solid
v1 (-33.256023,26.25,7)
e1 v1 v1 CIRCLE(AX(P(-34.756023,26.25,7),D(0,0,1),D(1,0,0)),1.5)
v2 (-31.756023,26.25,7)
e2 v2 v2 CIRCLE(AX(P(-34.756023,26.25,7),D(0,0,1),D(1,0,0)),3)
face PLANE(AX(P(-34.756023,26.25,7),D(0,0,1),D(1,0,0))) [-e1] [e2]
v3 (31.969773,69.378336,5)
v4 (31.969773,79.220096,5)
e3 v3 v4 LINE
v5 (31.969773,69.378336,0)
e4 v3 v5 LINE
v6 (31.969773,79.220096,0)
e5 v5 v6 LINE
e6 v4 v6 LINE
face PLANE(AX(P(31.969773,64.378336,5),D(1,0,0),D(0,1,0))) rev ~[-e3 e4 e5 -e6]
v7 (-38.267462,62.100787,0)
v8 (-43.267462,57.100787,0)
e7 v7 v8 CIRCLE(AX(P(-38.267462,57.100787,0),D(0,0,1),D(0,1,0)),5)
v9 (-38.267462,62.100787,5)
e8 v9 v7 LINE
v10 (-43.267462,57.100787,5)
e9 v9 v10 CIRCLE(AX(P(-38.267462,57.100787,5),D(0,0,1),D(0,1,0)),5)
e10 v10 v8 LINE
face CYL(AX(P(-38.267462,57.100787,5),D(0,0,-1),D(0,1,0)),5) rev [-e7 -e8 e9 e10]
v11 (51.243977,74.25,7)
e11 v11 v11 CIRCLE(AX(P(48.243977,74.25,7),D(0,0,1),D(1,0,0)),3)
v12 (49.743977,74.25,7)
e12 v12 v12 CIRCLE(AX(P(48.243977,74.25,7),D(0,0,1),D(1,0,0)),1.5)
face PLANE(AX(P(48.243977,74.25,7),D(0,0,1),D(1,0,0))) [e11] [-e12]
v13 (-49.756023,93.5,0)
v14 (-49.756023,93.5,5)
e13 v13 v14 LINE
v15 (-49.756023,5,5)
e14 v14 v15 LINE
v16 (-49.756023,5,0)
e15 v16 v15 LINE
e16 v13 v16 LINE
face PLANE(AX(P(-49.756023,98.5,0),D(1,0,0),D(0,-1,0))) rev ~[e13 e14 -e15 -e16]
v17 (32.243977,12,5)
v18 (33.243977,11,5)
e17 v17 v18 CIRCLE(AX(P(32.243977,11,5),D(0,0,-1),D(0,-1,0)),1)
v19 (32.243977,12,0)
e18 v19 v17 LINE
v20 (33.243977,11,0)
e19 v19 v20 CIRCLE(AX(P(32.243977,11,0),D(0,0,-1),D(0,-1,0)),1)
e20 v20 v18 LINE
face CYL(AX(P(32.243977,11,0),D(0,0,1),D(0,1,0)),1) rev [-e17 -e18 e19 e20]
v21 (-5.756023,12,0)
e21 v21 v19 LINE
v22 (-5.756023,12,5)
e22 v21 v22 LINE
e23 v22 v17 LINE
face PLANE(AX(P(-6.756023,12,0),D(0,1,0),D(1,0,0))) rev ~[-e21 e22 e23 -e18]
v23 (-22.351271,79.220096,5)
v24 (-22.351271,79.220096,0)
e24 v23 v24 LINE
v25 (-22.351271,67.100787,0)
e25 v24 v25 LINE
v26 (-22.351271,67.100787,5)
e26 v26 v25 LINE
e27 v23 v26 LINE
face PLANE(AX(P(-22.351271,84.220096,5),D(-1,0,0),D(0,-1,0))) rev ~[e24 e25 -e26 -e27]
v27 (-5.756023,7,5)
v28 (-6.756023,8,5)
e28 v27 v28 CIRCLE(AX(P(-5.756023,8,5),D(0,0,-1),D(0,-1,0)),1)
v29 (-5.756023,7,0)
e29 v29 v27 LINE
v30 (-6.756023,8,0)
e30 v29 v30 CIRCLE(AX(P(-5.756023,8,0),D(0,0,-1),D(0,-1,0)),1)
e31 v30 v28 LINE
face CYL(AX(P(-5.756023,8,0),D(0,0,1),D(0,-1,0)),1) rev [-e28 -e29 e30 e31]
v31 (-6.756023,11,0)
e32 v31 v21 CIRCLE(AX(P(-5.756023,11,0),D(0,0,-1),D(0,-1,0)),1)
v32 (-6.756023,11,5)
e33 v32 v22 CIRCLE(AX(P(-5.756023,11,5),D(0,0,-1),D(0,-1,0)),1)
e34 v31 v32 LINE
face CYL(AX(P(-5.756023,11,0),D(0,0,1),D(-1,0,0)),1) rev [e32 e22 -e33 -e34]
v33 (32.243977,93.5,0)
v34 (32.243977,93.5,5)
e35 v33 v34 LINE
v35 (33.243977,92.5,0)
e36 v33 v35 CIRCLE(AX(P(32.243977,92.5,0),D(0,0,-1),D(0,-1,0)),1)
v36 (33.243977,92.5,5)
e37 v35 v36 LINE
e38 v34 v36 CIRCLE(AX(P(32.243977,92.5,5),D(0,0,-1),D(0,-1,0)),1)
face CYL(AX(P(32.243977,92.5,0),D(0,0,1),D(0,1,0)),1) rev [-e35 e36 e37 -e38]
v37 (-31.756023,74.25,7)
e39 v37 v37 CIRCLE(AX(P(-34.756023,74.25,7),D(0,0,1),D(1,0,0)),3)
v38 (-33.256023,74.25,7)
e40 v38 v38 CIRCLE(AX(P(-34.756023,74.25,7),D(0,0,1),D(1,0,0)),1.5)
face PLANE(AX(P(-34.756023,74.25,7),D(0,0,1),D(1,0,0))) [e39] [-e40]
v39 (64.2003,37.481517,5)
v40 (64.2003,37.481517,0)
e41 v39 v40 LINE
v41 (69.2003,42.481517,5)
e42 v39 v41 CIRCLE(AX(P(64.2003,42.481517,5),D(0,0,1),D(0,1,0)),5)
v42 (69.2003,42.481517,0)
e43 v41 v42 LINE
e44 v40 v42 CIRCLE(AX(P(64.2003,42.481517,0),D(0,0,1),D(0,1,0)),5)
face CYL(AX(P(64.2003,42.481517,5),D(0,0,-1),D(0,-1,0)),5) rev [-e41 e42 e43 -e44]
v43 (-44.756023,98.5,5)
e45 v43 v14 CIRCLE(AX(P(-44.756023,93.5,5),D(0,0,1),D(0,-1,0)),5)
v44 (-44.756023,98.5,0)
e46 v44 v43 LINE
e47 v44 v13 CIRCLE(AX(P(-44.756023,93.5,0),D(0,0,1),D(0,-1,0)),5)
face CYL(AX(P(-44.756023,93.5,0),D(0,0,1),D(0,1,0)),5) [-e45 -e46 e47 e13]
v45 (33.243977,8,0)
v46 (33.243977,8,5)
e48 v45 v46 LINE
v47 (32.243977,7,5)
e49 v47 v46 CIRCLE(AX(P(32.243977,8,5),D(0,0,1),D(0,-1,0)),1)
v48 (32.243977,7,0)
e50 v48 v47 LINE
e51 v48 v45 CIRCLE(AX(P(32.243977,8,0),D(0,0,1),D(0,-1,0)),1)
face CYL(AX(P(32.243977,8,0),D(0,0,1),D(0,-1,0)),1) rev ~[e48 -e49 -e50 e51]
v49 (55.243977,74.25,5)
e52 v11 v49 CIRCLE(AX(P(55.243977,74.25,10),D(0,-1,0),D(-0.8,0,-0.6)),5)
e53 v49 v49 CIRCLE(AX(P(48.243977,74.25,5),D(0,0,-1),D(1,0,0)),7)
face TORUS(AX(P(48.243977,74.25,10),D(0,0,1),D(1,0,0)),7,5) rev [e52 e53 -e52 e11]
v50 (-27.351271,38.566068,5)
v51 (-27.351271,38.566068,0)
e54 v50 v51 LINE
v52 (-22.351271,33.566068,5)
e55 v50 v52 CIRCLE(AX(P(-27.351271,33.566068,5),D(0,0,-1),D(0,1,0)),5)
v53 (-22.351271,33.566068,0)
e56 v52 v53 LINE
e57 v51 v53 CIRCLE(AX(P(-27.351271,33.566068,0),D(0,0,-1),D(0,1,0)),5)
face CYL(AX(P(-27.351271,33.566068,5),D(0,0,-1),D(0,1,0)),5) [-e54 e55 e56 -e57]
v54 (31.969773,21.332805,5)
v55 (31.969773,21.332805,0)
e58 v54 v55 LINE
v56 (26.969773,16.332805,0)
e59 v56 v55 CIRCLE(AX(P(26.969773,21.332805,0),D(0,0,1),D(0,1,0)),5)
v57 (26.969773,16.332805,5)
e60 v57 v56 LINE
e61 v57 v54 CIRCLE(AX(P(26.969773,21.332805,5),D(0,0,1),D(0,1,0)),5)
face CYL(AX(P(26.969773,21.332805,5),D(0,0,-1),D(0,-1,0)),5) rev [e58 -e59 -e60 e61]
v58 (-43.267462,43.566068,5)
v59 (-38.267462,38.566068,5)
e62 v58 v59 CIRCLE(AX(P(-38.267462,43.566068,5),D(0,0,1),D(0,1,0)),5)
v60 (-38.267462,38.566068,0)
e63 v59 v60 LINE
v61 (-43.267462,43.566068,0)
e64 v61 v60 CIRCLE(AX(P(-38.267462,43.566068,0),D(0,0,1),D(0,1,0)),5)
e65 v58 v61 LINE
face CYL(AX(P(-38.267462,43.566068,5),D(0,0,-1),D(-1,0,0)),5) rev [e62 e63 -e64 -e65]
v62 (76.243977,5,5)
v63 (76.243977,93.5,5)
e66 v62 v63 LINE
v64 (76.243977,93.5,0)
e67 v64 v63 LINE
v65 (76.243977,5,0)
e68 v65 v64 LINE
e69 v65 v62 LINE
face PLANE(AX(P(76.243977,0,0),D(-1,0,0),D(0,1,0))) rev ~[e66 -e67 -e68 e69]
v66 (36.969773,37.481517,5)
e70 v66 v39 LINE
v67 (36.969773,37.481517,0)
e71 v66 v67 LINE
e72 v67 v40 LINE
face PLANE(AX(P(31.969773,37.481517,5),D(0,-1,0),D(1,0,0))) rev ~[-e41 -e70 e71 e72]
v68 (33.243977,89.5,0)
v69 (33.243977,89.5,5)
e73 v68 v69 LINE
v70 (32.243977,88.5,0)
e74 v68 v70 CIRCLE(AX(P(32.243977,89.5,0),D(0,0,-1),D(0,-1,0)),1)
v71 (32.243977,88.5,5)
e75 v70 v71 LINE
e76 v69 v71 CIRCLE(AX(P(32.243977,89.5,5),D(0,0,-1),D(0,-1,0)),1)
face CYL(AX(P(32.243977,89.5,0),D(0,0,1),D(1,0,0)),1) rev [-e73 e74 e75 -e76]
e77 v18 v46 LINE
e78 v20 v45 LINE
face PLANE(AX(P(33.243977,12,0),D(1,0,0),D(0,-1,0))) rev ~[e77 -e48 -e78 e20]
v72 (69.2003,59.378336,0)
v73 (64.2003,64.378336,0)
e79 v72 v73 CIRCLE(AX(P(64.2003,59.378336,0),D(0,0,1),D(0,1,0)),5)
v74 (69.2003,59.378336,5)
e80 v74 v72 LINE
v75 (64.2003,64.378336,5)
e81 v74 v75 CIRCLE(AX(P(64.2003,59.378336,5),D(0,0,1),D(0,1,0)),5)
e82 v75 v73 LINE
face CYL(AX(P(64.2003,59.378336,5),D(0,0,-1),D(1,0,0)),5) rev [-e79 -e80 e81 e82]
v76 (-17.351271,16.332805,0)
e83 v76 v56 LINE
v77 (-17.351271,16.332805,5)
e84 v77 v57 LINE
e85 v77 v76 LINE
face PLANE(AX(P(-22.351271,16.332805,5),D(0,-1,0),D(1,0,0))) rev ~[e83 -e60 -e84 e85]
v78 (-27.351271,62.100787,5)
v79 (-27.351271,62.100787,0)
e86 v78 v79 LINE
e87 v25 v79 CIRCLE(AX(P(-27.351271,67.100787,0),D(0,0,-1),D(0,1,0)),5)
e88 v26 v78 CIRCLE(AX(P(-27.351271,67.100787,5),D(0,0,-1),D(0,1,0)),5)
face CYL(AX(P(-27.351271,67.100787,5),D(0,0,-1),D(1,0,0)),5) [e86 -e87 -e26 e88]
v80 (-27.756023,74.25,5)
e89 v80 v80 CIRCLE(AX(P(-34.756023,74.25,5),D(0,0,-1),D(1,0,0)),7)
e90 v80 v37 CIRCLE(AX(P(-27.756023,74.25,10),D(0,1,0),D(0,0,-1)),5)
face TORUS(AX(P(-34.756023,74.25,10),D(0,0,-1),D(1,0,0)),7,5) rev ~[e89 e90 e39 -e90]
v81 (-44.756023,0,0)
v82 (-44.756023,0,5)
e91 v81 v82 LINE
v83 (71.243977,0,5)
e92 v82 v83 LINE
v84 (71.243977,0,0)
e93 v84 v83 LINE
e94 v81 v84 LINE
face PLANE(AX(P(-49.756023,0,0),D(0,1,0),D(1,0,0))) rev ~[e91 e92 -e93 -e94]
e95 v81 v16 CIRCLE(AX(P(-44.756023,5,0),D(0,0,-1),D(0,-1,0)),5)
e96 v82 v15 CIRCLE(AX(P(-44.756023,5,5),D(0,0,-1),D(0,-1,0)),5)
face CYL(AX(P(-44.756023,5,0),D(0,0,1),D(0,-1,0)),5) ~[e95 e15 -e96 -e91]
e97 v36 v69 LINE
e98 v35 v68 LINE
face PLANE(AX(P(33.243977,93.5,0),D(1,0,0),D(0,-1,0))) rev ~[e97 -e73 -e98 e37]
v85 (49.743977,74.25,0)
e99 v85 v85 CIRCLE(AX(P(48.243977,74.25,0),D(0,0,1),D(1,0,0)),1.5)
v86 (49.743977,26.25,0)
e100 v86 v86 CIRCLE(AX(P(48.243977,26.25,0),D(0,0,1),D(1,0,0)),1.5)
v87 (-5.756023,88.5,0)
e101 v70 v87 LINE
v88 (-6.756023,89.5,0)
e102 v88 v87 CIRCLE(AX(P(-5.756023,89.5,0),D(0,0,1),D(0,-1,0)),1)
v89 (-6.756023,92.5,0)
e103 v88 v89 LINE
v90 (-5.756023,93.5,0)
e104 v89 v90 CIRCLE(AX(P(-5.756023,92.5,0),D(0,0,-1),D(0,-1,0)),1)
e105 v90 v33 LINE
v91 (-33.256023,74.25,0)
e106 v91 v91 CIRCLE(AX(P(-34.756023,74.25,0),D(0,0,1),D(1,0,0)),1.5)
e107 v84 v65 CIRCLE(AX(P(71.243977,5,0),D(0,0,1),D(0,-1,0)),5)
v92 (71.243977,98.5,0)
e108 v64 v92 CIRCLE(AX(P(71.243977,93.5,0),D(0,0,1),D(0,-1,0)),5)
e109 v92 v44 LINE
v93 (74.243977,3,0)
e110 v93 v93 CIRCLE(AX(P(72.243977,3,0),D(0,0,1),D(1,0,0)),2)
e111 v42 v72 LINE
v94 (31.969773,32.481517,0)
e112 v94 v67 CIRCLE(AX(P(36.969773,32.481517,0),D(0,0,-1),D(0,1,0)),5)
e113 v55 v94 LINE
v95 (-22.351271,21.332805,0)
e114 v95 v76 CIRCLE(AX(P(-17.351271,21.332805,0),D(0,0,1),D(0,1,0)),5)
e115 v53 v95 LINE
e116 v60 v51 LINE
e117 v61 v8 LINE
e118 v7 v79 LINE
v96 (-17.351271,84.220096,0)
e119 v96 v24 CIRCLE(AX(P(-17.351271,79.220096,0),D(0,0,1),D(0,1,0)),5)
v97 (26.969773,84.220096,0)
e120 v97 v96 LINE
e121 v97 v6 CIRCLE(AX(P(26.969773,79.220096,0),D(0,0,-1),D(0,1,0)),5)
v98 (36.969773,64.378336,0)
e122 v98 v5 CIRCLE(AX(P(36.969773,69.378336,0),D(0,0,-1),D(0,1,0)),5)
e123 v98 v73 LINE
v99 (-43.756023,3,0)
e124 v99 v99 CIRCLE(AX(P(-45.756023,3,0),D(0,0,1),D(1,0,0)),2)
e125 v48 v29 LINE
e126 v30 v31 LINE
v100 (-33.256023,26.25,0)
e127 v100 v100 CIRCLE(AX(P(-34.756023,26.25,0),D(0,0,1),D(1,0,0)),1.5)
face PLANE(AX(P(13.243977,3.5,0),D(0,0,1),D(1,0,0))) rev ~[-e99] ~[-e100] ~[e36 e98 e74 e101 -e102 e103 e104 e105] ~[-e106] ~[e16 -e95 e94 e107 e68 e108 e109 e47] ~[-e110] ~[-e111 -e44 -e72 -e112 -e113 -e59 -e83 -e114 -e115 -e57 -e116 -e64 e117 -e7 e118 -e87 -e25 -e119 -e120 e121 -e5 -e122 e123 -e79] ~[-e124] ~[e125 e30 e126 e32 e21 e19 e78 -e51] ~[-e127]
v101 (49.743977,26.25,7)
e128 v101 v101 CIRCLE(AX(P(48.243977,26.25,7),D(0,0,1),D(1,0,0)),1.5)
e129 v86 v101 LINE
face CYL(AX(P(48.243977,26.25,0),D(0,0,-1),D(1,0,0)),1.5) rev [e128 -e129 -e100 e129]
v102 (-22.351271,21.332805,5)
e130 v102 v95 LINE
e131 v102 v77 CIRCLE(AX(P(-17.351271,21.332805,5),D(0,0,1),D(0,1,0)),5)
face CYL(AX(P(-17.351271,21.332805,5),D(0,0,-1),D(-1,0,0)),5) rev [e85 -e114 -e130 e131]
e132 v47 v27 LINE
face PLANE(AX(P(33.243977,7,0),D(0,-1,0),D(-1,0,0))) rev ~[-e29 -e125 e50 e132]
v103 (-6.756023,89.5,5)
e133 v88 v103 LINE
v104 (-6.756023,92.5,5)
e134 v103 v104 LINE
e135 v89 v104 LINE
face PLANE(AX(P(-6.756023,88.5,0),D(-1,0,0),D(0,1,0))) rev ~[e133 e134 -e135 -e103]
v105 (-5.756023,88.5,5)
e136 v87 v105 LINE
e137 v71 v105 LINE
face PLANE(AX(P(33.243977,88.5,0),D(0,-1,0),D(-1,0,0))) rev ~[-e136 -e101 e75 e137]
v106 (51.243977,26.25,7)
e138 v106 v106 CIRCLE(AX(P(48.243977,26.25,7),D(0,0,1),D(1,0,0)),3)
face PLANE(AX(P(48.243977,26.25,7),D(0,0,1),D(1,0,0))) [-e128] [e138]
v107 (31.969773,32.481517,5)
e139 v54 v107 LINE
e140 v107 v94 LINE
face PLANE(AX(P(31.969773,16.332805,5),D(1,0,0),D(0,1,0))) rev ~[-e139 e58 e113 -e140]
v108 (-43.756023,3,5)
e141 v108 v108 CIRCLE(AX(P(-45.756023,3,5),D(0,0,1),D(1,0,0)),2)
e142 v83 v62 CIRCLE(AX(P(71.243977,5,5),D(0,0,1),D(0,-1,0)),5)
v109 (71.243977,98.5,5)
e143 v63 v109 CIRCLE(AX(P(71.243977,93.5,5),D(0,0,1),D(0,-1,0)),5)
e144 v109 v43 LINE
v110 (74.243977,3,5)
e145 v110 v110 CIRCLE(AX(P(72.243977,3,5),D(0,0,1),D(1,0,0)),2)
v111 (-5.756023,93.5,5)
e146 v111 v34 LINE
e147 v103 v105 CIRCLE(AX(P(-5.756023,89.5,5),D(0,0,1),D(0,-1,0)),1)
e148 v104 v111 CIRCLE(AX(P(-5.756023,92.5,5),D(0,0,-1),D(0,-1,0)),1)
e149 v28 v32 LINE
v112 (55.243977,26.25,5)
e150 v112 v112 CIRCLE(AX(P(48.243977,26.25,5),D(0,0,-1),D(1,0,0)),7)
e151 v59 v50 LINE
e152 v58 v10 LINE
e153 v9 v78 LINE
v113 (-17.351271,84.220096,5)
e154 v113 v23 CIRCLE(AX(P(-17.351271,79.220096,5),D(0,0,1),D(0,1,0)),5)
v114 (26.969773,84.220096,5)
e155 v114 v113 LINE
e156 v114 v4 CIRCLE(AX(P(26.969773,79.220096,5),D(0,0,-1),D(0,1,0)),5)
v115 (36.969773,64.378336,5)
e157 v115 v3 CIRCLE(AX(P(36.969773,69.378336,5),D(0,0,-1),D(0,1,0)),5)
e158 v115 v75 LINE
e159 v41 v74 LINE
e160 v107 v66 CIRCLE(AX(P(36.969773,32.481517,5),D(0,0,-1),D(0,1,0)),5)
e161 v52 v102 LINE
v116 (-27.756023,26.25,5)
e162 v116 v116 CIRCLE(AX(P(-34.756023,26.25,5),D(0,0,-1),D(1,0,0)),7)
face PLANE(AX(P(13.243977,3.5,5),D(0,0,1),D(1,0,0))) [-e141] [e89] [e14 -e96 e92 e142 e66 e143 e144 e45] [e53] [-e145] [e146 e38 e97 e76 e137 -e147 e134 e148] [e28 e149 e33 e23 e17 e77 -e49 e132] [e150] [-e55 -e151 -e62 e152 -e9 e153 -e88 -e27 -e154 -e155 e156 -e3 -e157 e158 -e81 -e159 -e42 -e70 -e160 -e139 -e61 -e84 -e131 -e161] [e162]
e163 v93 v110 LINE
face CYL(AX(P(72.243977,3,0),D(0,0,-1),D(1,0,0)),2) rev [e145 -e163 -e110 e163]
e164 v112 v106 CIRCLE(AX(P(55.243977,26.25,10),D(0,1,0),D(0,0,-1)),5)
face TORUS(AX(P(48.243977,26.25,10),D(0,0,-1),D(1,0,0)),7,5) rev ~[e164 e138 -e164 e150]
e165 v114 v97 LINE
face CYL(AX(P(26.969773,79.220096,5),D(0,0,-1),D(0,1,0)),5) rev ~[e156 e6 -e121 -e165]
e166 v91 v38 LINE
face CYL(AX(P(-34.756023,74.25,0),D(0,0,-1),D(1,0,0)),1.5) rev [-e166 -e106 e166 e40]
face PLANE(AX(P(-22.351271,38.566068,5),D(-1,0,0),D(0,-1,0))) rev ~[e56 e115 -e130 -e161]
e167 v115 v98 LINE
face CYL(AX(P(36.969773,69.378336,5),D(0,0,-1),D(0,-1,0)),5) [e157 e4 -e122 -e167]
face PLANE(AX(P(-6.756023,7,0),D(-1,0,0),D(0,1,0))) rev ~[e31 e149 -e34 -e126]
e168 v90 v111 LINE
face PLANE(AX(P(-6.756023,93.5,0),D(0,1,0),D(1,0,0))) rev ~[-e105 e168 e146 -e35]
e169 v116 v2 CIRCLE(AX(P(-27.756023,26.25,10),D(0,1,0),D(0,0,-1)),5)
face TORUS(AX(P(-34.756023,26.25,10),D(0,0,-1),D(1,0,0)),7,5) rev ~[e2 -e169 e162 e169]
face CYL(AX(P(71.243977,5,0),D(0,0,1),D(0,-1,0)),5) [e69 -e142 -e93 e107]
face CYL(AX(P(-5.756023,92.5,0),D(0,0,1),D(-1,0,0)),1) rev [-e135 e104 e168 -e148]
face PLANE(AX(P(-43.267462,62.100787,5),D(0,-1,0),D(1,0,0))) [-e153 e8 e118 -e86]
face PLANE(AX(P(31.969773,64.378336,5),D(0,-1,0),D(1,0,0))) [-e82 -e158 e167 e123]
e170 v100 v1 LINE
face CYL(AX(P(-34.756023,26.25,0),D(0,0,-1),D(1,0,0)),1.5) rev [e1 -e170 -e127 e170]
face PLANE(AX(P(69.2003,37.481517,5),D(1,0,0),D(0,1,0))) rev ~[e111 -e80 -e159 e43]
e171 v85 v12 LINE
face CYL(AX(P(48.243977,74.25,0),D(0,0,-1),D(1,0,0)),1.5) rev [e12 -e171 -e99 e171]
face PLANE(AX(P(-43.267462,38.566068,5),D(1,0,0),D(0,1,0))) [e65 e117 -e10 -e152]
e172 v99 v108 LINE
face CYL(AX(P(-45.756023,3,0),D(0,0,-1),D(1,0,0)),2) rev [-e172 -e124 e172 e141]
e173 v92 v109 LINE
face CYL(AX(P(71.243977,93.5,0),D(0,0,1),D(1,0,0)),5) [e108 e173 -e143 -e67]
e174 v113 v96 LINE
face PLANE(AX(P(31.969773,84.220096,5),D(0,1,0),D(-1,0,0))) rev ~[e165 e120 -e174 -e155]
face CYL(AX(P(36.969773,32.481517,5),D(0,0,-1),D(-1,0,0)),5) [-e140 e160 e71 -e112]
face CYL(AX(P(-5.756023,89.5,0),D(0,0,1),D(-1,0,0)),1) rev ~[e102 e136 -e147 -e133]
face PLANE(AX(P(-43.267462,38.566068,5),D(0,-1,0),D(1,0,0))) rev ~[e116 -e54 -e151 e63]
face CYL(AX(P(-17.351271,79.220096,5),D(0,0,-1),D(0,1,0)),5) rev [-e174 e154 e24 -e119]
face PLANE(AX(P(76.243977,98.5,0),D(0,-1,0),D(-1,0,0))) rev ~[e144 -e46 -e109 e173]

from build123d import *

# Parameters (mm, degrees)
F0_R     = 2
F0_R_2   = 3
F0_R_3   = 1.5
F0_R_4   = 5
F1_DEPTH = 5
F2_R     = 1
F3_R     = 5
F4_DEPTH = 7
F6_W     = 20.916191861
F6_H     = 23.5347189009
F6_W_2   = 37.2305270284
F6_H_2   = 26.8968194723
F7_DEPTH = 25
F8_R     = 5


# Not quite as in the source:
# - a fillet or chamfer that OpenCascade refuses, or shapes differently, is made with other operations: its cross-section is extruded or revolved along the edge and cut away or added


with BuildPart() as f1:
    # F0 (on Top) → F1 (new body)
    with BuildSketch(Plane.XY):
        Polygon((-49.7560231508, 7), (-49.7560231508, 0), (76.2439768492, 0), (76.2439768492, 7), (33.2439768492, 7), (-6.7560231508, 7), align=None)
        with Locations((-45.7560231508, 3)):
            Circle(F0_R, mode=Mode.SUBTRACT)
        with Locations((72.2439768492, 3)):
            Circle(F0_R, mode=Mode.SUBTRACT)
        Polygon((-49.7560231508, 93.5), (-49.7560231508, 7), (-6.7560231508, 7), (-6.7560231508, 12), (33.2439768492, 12), (33.2439768492, 7), (76.2439768492, 7), (76.2439768492, 93.5), (33.2439768492, 93.5), (33.2439768492, 88.5), (-6.7560231508, 88.5), (-6.7560231508, 93.5), align=None)
        with Locations((-34.7560231508, 26.25)):
            Circle(F0_R_2, mode=Mode.SUBTRACT)
        with Locations((3.2439768492, 40.25)):
            Circle(F0_R_3, mode=Mode.SUBTRACT)
        with Locations((23.2439768492, 40.25)):
            Circle(F0_R_3, mode=Mode.SUBTRACT)
        with Locations((48.2439768492, 26.25)):
            Circle(F0_R_2, mode=Mode.SUBTRACT)
        with Locations((3.2439768492, 60.25)):
            Circle(F0_R_3, mode=Mode.SUBTRACT)
        with Locations((-34.7560231508, 74.25)):
            Circle(F0_R_2, mode=Mode.SUBTRACT)
        with Locations((13.2439768492, 50.25)):
            Circle(F0_R_4, mode=Mode.SUBTRACT)
        with Locations((23.2439768492, 60.25)):
            Circle(F0_R_3, mode=Mode.SUBTRACT)
        with Locations((48.2439768492, 74.25)):
            Circle(F0_R_2, mode=Mode.SUBTRACT)
        Polygon((-49.7560231508, 98.5), (-49.7560231508, 93.5), (-6.7560231508, 93.5), (33.2439768492, 93.5), (76.2439768492, 93.5), (76.2439768492, 98.5), align=None)
        with Locations((-34.7560231508, 26.25)):
            Circle(F0_R_2)
        with Locations((-34.7560231508, 26.25)):
            Circle(F0_R_3, mode=Mode.SUBTRACT)
        with Locations((-34.7560231508, 74.25)):
            Circle(F0_R_2)
        with Locations((-34.7560231508, 74.25)):
            Circle(F0_R_3, mode=Mode.SUBTRACT)
        with Locations((48.2439768492, 26.25)):
            Circle(F0_R_2)
        with Locations((48.2439768492, 26.25)):
            Circle(F0_R_3, mode=Mode.SUBTRACT)
        with Locations((48.2439768492, 74.25)):
            Circle(F0_R_2)
        with Locations((48.2439768492, 74.25)):
            Circle(F0_R_3, mode=Mode.SUBTRACT)
        with Locations((13.2439768492, 50.25)):
            Circle(F0_R_4)
        with Locations((3.2439768492, 60.25)):
            Circle(F0_R_3)
        with Locations((3.2439768492, 40.25)):
            Circle(F0_R_3)
        with Locations((23.2439768492, 40.25)):
            Circle(F0_R_3)
        with Locations((23.2439768492, 60.25)):
            Circle(F0_R_3)
    extrude(amount=F1_DEPTH)

    # F2
    f2_edges = [f1.edges().sort_by_distance(p)[0] for p in [
        (-6.756023, 12, 2.5),
        (33.243977, 12, 2.5),
        (-6.756023, 7, 2.5),
        (33.243977, 7, 2.5),
        (-6.756023, 88.5, 2.5),
        (-6.756023, 93.5, 2.5),
        (33.243977, 93.5, 2.5),
        (33.243977, 88.5, 2.5),
    ]]
    fillet(f2_edges, radius=F2_R)

    # F3
    f3_edges = [f1.edges().sort_by_distance(p)[0] for p in [
        (-49.756023, 0, 2.5),
        (76.243977, 0, 2.5),
        (76.243977, 98.5, 2.5),
        (-49.756023, 98.5, 2.5),
    ]]
    fillet(f3_edges, radius=F3_R)

    # F0 (on Top) → F4 (join)
    with BuildSketch(Plane.XY):
        with Locations((-34.7560231508, 74.25)):
            Circle(F0_R_2)
        with Locations((-34.7560231508, 74.25)):
            Circle(F0_R_3, mode=Mode.SUBTRACT)
        with Locations((-34.7560231508, 26.25)):
            Circle(F0_R_2)
        with Locations((-34.7560231508, 26.25)):
            Circle(F0_R_3, mode=Mode.SUBTRACT)
        with Locations((48.2439768492, 74.25)):
            Circle(F0_R_2)
        with Locations((48.2439768492, 74.25)):
            Circle(F0_R_3, mode=Mode.SUBTRACT)
        with Locations((48.2439768492, 26.25)):
            Circle(F0_R_2)
        with Locations((48.2439768492, 26.25)):
            Circle(F0_R_3, mode=Mode.SUBTRACT)
    extrude(amount=F4_DEPTH)

    # F5: fillet of radius 5 on 4 edges, made by hand

    # F5_s1 → F5_t2 (revolve)
    with BuildSketch(Plane.XZ.offset(-74.25)):
        with BuildLine():
            ThreePointArc((-27.7560231508, 5), (-29.9920911283, 5.527864045), (-31.7560231508, 7))
            Line((-31.7560231508, 7), (-31.7560231508, 5))
            Line((-31.7560231508, 5), (-27.7560231508, 5))
        make_face()
    revolve(axis=Axis((-34.7560231508, 74.25, 5), (0, 0, -1)))

    # F5_s3 → F5_t4 (revolve)
    with BuildSketch(Plane.XZ.offset(-26.25)):
        with BuildLine():
            ThreePointArc((-27.7560231508, 5), (-29.9920911283, 5.527864045), (-31.7560231508, 7))
            Line((-31.7560231508, 7), (-31.7560231508, 5))
            Line((-31.7560231508, 5), (-27.7560231508, 5))
        make_face()
    revolve(axis=Axis((-34.7560231508, 26.25, 5), (0, 0, -1)))

    # F5_s5 → F5_t6 (revolve)
    with BuildSketch(Plane.XZ.offset(-26.25)):
        with BuildLine():
            ThreePointArc((55.2439768492, 5), (53.0079088717, 5.527864045), (51.2439768492, 7))
            Line((51.2439768492, 7), (51.2439768492, 5))
            Line((51.2439768492, 5), (55.2439768492, 5))
        make_face()
    revolve(axis=Axis((48.2439768492, 26.25, 5), (0, 0, -1)))

    # F5_s7 → F5_t8 (revolve)
    with BuildSketch(Plane.XZ.offset(-74.25)):
        with BuildLine():
            ThreePointArc((51.2439768492, 7), (53.0079088717, 5.527864045), (55.2439768492, 5))
            Line((55.2439768492, 5), (51.2439768492, 5))
            Line((51.2439768492, 5), (51.2439768492, 7))
        make_face()
    revolve(axis=Axis((48.2439768492, 74.25, 5), (0, 0, -1)))

    # F6 (on face) → F7 (cut)
    with BuildSketch(Plane.XY.offset(5)):
        Polygon((31.9697726518, 84.2200964689), (-22.3512705415, 84.2200964689), (-22.3512705415, 62.1007867157), (-22.3512705415, 38.5660678148), (-22.3512705415, 16.3328051567), (31.9697726518, 16.3328051567), (31.9697726518, 37.4815165997), (31.9697726518, 64.378336072), align=None)
        with Locations((-32.8093664721, 50.3334272653)):
            Rectangle(F6_W, F6_H)
        with Locations((50.585036166, 50.9299263358)):
            Rectangle(F6_W_2, F6_H_2)
    extrude(amount=-F7_DEPTH, mode=Mode.SUBTRACT)

    # F8
    f8_edges = [f1.edges().sort_by_distance(p)[0] for p in [
        (-22.351271, 62.100787, 2.5),
        (31.969773, 64.378336, 2.5),
        (31.969773, 37.481517, 2.5),
        (-22.351271, 38.566068, 2.5),
        (-43.267462, 38.566068, 2.5),
        (-43.267462, 62.100787, 2.5),
        (-22.351271, 84.220096, 2.5),
        (31.969773, 84.220096, 2.5),
        (69.2003, 64.378336, 2.5),
        (69.2003, 37.481517, 2.5),
        (31.969773, 16.332805, 2.5),
        (-22.351271, 16.332805, 2.5),
    ]]
    fillet(f8_edges, radius=F8_R)


solid = f1.part
